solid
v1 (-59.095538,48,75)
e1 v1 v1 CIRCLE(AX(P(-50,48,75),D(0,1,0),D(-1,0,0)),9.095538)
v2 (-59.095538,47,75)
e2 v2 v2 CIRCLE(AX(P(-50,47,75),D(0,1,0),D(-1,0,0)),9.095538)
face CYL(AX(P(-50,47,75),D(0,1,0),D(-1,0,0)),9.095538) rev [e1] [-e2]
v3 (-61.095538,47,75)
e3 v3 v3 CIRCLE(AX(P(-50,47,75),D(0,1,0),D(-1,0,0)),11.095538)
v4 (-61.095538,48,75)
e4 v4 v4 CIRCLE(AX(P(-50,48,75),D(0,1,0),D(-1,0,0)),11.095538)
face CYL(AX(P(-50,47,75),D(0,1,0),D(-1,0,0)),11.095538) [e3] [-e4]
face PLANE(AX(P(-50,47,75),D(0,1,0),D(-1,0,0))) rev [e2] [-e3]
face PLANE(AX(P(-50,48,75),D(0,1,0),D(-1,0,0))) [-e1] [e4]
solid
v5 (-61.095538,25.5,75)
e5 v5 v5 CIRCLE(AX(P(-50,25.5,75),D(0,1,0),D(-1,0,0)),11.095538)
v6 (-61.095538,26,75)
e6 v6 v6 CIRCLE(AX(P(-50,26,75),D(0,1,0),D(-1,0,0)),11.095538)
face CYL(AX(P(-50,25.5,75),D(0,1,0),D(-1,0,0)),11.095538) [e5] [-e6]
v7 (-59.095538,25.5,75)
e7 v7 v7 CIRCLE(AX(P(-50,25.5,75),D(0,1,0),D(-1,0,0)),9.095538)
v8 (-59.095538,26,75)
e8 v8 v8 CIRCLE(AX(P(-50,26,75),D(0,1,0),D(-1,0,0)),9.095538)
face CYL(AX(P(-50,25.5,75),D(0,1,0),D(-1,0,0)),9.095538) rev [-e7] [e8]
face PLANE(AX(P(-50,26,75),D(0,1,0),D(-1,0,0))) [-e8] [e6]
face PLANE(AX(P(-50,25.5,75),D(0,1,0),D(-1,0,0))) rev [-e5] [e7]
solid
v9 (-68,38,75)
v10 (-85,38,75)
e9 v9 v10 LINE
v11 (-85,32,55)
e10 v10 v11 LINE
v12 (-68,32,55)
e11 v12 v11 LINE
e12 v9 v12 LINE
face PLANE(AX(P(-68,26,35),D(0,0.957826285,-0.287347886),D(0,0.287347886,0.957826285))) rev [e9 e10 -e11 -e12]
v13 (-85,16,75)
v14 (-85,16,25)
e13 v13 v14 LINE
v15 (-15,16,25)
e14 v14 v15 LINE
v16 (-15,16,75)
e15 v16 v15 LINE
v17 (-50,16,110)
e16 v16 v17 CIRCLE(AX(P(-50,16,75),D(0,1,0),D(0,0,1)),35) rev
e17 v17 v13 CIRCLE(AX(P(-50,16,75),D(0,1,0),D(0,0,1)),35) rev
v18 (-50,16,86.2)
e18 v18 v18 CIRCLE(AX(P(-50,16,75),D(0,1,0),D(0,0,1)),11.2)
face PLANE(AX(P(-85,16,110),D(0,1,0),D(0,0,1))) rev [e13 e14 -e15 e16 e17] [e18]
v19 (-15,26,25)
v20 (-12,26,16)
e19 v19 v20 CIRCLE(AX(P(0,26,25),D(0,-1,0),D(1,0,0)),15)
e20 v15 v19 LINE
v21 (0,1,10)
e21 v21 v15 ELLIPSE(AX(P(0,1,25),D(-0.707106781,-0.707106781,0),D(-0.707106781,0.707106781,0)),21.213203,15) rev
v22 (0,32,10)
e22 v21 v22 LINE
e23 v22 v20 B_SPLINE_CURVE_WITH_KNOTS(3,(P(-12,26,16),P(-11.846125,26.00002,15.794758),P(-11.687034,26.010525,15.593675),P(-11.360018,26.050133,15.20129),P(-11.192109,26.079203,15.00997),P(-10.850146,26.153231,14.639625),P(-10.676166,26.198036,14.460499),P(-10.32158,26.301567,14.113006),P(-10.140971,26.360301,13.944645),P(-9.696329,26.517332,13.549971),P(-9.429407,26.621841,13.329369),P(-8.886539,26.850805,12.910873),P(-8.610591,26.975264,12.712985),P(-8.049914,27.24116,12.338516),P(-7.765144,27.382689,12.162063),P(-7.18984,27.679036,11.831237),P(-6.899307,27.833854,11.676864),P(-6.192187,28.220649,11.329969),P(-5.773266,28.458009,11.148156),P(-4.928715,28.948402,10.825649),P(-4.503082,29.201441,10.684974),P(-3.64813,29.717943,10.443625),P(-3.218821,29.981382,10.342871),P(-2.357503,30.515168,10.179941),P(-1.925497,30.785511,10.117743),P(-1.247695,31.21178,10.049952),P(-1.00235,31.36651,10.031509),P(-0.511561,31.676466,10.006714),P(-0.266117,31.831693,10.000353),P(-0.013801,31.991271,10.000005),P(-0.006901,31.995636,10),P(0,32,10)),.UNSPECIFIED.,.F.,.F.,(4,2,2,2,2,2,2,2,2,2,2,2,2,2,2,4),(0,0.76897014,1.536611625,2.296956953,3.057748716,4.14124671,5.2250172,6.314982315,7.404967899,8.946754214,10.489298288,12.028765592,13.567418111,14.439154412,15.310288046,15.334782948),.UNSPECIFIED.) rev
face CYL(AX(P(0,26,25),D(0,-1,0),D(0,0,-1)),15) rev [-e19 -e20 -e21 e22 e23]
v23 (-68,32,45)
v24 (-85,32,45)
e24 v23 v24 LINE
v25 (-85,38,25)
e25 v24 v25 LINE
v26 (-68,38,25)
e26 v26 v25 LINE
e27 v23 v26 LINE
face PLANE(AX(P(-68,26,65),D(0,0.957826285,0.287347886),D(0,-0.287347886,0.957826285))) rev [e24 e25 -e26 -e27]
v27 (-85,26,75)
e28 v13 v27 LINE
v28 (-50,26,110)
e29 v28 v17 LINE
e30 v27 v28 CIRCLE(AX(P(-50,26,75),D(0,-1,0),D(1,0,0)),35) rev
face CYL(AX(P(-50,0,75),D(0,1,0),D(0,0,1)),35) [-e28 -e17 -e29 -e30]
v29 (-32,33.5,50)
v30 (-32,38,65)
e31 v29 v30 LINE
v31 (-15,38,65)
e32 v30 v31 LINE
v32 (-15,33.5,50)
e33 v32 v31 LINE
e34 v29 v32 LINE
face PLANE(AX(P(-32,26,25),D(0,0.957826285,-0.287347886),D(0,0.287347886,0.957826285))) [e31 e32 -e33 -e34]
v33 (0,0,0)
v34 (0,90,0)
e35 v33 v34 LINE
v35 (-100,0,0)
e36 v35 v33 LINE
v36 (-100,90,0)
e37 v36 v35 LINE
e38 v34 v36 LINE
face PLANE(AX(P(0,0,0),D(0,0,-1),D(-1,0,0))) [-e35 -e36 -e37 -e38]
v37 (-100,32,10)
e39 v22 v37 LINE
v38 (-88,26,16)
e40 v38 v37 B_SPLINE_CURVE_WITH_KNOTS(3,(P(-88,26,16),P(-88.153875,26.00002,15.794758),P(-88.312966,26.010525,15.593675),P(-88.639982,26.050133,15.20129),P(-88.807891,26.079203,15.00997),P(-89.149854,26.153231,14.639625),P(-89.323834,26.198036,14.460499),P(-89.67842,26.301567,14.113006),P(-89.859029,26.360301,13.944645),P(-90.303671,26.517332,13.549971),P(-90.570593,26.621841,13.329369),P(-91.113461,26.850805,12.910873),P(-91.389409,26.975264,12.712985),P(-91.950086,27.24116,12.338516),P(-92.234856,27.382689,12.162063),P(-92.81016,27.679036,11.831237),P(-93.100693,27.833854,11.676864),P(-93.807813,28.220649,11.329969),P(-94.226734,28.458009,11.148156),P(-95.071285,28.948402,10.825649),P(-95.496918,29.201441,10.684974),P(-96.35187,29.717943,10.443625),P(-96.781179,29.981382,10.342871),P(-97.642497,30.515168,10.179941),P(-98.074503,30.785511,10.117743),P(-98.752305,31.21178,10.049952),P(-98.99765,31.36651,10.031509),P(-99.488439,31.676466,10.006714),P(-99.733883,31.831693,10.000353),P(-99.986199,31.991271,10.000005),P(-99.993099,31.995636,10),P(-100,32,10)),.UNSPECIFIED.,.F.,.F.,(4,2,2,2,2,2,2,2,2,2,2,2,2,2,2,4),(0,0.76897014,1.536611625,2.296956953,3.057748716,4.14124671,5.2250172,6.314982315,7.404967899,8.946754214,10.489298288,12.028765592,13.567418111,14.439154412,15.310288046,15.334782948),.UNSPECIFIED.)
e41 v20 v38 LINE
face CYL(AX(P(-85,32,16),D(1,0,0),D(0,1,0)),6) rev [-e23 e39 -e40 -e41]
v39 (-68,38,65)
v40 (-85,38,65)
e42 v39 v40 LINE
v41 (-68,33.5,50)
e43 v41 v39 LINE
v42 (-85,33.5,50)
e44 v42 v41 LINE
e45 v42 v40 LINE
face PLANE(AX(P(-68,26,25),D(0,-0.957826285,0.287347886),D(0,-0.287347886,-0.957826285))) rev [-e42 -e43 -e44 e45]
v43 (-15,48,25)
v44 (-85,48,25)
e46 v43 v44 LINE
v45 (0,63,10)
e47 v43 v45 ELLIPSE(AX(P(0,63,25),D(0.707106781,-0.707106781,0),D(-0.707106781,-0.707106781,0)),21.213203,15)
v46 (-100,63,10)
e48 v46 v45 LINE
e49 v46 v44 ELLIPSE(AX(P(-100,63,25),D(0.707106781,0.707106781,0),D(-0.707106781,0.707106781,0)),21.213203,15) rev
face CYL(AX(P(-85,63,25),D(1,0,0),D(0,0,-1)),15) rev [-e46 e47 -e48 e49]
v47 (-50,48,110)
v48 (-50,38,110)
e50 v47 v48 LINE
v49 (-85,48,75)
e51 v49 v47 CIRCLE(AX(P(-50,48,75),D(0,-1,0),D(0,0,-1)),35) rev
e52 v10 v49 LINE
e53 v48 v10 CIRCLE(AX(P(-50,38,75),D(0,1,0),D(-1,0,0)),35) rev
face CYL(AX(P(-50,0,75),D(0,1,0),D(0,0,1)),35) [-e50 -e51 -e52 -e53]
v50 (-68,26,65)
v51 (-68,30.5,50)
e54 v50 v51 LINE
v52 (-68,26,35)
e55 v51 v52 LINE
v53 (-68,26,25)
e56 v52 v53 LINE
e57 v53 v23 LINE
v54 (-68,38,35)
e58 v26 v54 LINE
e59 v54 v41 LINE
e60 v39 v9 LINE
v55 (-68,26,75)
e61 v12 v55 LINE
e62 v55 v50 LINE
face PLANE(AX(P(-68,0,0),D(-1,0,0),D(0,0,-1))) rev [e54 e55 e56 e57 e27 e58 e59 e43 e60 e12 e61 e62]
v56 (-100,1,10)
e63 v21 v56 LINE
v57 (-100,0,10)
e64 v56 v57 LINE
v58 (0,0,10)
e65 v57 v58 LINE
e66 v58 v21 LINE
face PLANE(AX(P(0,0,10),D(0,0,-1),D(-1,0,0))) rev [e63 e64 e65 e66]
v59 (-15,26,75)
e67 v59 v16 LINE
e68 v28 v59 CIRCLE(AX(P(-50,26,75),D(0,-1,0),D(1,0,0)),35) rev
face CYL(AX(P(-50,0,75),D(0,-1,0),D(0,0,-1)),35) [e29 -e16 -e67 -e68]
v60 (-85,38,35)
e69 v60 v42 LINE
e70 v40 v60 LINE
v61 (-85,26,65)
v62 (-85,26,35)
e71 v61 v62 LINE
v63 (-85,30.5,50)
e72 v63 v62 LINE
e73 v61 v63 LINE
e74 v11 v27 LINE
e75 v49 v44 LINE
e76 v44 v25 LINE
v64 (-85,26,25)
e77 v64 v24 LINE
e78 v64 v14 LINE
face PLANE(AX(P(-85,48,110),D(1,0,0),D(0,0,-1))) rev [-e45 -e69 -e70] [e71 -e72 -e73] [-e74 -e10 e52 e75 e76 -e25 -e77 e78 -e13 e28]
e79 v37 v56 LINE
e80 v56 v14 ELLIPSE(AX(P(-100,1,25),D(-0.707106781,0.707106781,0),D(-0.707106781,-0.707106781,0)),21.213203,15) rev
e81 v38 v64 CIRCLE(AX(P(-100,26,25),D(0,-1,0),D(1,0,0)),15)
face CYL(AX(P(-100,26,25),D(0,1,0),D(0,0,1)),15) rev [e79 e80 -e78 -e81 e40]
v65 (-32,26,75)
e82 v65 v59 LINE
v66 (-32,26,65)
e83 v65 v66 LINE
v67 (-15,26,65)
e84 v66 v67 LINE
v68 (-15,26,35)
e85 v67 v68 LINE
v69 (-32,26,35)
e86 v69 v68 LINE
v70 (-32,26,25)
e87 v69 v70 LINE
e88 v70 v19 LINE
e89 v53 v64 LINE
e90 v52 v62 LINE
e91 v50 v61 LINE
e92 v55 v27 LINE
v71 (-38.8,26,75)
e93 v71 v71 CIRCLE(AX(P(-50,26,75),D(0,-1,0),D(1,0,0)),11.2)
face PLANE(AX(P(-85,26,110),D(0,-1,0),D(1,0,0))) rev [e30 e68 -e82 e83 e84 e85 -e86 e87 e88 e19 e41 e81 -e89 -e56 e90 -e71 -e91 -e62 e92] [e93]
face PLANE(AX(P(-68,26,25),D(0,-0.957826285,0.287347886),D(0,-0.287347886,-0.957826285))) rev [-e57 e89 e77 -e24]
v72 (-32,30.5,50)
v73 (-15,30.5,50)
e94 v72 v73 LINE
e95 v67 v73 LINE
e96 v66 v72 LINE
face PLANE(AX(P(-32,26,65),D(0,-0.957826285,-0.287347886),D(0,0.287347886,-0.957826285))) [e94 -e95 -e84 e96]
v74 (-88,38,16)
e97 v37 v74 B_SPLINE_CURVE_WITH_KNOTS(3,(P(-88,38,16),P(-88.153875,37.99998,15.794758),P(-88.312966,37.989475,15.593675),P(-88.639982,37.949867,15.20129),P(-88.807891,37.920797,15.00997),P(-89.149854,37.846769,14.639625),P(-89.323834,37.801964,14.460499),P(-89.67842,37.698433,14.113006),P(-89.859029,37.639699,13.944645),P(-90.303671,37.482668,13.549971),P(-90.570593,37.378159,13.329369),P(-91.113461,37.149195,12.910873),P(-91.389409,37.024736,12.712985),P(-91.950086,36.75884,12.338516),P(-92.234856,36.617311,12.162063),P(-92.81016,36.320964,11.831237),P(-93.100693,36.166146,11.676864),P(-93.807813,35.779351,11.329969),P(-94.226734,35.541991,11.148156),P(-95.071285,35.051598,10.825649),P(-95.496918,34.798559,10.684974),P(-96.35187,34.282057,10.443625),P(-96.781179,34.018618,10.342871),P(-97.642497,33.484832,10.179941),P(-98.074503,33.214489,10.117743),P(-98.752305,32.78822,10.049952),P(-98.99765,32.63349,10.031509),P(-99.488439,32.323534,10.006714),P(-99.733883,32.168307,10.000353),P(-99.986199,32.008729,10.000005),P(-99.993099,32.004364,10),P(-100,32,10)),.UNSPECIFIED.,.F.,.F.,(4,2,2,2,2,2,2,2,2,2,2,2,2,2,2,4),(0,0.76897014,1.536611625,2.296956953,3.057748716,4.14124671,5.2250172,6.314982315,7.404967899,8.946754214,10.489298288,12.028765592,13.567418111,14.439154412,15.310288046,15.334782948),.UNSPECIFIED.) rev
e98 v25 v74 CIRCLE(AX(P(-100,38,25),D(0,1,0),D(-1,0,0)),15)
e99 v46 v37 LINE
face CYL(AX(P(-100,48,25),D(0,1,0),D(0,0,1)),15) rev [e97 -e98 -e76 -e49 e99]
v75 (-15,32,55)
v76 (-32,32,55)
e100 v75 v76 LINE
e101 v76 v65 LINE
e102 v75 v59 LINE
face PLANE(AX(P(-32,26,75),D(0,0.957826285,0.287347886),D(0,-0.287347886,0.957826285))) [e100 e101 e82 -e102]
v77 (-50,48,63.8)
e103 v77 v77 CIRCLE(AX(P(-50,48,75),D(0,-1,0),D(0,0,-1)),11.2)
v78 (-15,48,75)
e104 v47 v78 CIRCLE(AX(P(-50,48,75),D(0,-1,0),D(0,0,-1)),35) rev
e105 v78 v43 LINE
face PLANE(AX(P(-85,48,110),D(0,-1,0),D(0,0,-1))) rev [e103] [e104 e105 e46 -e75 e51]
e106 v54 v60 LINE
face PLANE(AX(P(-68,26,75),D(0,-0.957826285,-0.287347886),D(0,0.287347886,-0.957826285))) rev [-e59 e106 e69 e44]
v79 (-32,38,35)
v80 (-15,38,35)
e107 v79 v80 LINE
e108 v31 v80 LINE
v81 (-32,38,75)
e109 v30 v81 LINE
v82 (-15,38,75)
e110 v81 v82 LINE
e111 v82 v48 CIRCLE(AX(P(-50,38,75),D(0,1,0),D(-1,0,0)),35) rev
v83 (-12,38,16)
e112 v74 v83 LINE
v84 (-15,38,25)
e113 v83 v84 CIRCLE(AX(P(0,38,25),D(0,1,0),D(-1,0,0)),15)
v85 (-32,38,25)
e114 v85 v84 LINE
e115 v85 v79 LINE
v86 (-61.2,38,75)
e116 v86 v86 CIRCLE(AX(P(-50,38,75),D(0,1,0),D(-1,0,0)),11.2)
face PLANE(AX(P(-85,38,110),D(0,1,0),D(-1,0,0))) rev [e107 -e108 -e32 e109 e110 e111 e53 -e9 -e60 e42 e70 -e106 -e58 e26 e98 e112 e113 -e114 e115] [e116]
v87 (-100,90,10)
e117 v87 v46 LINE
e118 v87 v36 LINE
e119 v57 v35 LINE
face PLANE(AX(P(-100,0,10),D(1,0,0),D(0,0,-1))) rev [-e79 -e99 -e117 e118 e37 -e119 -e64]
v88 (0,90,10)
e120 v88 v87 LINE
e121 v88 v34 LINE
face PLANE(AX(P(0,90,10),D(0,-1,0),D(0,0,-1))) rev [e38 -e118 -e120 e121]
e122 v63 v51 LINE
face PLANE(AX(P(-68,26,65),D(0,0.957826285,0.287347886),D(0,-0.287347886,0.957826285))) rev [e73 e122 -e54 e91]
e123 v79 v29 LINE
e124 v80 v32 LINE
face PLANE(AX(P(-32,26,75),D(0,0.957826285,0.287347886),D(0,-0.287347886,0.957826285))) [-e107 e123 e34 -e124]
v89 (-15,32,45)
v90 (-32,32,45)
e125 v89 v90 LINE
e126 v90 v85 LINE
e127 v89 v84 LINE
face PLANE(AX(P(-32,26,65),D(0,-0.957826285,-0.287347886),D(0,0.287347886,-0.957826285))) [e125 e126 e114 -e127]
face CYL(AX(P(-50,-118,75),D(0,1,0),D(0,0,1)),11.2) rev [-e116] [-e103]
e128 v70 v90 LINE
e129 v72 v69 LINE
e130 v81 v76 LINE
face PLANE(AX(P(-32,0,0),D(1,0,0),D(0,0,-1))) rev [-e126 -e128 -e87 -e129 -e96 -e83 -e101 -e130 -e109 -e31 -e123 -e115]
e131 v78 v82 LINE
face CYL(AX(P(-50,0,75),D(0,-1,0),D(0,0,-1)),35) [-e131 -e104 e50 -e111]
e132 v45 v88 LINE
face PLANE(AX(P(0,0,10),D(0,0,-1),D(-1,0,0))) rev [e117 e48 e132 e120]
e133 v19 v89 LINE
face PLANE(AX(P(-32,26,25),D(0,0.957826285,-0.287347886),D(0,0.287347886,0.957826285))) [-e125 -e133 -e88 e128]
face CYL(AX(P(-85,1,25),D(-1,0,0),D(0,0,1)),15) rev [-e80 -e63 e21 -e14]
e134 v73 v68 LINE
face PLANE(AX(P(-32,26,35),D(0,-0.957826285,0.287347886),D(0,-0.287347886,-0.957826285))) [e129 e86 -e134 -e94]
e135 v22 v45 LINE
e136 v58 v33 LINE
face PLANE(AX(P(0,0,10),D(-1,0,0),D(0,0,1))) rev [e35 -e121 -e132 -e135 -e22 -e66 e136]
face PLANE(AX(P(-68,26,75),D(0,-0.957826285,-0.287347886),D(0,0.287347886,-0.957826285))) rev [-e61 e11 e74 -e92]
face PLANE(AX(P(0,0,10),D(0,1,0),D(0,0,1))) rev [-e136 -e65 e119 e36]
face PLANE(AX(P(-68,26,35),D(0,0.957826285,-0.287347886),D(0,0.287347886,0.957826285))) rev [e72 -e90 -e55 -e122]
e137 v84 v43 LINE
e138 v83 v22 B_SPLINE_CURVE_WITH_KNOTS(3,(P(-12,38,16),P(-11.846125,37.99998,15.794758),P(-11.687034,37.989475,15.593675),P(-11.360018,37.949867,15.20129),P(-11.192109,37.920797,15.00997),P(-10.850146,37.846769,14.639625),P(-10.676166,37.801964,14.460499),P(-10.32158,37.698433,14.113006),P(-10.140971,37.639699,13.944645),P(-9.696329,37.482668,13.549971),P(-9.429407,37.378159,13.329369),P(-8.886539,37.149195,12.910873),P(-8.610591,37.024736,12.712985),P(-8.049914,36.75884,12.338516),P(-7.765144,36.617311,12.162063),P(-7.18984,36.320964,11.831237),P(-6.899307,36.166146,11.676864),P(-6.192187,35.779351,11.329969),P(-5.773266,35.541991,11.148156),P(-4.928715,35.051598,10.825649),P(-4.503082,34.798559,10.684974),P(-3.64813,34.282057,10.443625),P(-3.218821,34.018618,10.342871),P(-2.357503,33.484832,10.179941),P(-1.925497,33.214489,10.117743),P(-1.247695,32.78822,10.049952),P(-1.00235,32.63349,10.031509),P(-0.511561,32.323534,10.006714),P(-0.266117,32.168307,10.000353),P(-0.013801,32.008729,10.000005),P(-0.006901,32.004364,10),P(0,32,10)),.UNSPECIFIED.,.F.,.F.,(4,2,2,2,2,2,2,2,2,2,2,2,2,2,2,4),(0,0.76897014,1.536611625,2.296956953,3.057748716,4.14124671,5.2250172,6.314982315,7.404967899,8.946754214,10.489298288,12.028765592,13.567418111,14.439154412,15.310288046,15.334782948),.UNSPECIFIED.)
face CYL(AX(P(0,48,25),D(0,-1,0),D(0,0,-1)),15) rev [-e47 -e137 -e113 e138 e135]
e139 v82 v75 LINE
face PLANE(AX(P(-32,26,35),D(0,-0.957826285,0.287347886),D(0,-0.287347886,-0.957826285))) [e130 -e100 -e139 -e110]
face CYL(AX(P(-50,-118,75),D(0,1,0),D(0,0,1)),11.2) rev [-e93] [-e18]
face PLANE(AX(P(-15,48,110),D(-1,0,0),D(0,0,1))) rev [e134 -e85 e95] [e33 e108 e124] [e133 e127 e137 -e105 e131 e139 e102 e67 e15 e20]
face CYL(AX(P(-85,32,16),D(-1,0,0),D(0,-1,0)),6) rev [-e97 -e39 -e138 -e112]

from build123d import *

# Parameters (mm, degrees)
ESQUISSE1_W             = 90
ESQUISSE1_H             = 100
BOSS_EXTRU_1_DEPTH      = 10
ESQUISSE2_W             = 70
ESQUISSE2_H             = 10
BOSS_EXTRU_2_DEPTH      = 100
CONG_1_R                = 35
ESQUISSE3_R             = 11.2
ENL_V_MAT_EXTRU_1_DEPTH = 208
CONG_2_R                = 15
ESQUISSE10_R            = 11.095538233
ESQUISSE10_R_2          = 9.095538233
BOSS_EXTRU_7_DEPTH      = 1
CONG_7_R                = 6
ESQUISSE15_R            = 11.095538233
ESQUISSE15_R_2          = 9.095538233
BOSS_EXTRU_11_DEPTH     = 0.5
BOSS_EXTRU_12_DEPTH     = 17
BOSS_EXTRU_13_DEPTH     = 17


with BuildPart() as part:
    # Esquisse1 → Boss.-Extru.1 (new body)
    with BuildSketch(Plane(origin=(0, 0, 0), x_dir=(0, 1, 0), z_dir=(0, 0, 1))):
        with Locations((45, 50)):
            Rectangle(ESQUISSE1_W, ESQUISSE1_H)
    extrude(amount=BOSS_EXTRU_1_DEPTH)

    # Esquisse2 → Boss.-Extru.2 (add)
    with BuildSketch(Plane.XY.offset(10)):
        with Locations((-50, 43)):
            Rectangle(ESQUISSE2_W, ESQUISSE2_H)
        with Locations((-50, 21)):
            Rectangle(ESQUISSE2_W, ESQUISSE2_H)
    extrude(amount=BOSS_EXTRU_2_DEPTH)

    # Congé1
    cong_1_edges = [part.edges().sort_by_distance(p)[0] for p in [
        (-15, 43, 110),
        (-85, 43, 110),
        (-15, 21, 110),
        (-85, 21, 110),
    ]]
    fillet(cong_1_edges, radius=CONG_1_R - 0.0001)  # a hair under: the kernel refuses the full size

    # Esquisse3 → Enlèv. mat.-Extru.1 (cut)
    with BuildSketch(Plane(origin=(0, 90, 0), x_dir=(-1, 0, 0), z_dir=(0, 1, 0))):
        with Locations((50, 75)):
            Circle(ESQUISSE3_R)
    extrude(amount=-ENL_V_MAT_EXTRU_1_DEPTH, mode=Mode.SUBTRACT)

    # Congé2
    cong_2_edges = [part.edges().sort_by_distance(p)[0] for p in [
        (-85, 43, 10),
        (-15, 43, 10),
        (-50, 48, 10),
        (-85, 21, 10),
        (-50, 16, 10),
        (-15, 21, 10),
    ]]
    fillet(cong_2_edges, radius=CONG_2_R - 0.0001)  # a hair under: the kernel refuses the full size

    # Congé7
    cong_7_edges = [part.edges().sort_by_distance(p)[0] for p in [
        (-50, 38, 10),
        (-50, 26, 10),
    ]]
    fillet(cong_7_edges, radius=CONG_7_R - 0.0001)  # a hair under: the kernel refuses the full size

    # Esquisse16 → Boss.-Extru.12 (add)
    with BuildSketch(Plane.YZ.offset(-15)):
        Polygon((26, 25), (26, 35), (38, 75), (38, 65), align=None)
    boss_extru_12 = extrude(amount=-BOSS_EXTRU_12_DEPTH)

    # Esquisse17 → Boss.-Extru.13 (add)
    with BuildSketch(Plane.YZ.offset(-15)):
        Polygon((26, 75), (26, 65), (38, 25), (38, 35), align=None)
    boss_extru_13 = extrude(amount=-BOSS_EXTRU_13_DEPTH)

    # Symétrie1: Boss.-Extru.12, Boss.-Extru.13 across plane
    add(boss_extru_12.mirror(Plane.ZY.offset(50)))
    add(boss_extru_13.mirror(Plane.ZY.offset(50)))


with BuildPart() as body_2:
    # Esquisse10 → Boss.-Extru.7 (new body)
    with BuildSketch(Plane(origin=(0, 48, 0), x_dir=(-1, 0, 0), z_dir=(0, 1, 0))):
        with Locations((50, 75)):
            Circle(ESQUISSE10_R)
        with Locations((50, 75)):
            Circle(ESQUISSE10_R_2, mode=Mode.SUBTRACT)
    extrude(amount=-BOSS_EXTRU_7_DEPTH)


with BuildPart() as body_3:
    # Esquisse15 → Boss.-Extru.11 (new body)
    with BuildSketch(Plane(origin=(0, 26, 0), x_dir=(-1, 0, 0), z_dir=(0, 1, 0))):
        with Locations((50, 75)):
            Circle(ESQUISSE15_R)
        with Locations((50, 75)):
            Circle(ESQUISSE15_R_2, mode=Mode.SUBTRACT)
    extrude(amount=-BOSS_EXTRU_11_DEPTH)


solid = Compound([part.part, body_2.part, body_3.part])
